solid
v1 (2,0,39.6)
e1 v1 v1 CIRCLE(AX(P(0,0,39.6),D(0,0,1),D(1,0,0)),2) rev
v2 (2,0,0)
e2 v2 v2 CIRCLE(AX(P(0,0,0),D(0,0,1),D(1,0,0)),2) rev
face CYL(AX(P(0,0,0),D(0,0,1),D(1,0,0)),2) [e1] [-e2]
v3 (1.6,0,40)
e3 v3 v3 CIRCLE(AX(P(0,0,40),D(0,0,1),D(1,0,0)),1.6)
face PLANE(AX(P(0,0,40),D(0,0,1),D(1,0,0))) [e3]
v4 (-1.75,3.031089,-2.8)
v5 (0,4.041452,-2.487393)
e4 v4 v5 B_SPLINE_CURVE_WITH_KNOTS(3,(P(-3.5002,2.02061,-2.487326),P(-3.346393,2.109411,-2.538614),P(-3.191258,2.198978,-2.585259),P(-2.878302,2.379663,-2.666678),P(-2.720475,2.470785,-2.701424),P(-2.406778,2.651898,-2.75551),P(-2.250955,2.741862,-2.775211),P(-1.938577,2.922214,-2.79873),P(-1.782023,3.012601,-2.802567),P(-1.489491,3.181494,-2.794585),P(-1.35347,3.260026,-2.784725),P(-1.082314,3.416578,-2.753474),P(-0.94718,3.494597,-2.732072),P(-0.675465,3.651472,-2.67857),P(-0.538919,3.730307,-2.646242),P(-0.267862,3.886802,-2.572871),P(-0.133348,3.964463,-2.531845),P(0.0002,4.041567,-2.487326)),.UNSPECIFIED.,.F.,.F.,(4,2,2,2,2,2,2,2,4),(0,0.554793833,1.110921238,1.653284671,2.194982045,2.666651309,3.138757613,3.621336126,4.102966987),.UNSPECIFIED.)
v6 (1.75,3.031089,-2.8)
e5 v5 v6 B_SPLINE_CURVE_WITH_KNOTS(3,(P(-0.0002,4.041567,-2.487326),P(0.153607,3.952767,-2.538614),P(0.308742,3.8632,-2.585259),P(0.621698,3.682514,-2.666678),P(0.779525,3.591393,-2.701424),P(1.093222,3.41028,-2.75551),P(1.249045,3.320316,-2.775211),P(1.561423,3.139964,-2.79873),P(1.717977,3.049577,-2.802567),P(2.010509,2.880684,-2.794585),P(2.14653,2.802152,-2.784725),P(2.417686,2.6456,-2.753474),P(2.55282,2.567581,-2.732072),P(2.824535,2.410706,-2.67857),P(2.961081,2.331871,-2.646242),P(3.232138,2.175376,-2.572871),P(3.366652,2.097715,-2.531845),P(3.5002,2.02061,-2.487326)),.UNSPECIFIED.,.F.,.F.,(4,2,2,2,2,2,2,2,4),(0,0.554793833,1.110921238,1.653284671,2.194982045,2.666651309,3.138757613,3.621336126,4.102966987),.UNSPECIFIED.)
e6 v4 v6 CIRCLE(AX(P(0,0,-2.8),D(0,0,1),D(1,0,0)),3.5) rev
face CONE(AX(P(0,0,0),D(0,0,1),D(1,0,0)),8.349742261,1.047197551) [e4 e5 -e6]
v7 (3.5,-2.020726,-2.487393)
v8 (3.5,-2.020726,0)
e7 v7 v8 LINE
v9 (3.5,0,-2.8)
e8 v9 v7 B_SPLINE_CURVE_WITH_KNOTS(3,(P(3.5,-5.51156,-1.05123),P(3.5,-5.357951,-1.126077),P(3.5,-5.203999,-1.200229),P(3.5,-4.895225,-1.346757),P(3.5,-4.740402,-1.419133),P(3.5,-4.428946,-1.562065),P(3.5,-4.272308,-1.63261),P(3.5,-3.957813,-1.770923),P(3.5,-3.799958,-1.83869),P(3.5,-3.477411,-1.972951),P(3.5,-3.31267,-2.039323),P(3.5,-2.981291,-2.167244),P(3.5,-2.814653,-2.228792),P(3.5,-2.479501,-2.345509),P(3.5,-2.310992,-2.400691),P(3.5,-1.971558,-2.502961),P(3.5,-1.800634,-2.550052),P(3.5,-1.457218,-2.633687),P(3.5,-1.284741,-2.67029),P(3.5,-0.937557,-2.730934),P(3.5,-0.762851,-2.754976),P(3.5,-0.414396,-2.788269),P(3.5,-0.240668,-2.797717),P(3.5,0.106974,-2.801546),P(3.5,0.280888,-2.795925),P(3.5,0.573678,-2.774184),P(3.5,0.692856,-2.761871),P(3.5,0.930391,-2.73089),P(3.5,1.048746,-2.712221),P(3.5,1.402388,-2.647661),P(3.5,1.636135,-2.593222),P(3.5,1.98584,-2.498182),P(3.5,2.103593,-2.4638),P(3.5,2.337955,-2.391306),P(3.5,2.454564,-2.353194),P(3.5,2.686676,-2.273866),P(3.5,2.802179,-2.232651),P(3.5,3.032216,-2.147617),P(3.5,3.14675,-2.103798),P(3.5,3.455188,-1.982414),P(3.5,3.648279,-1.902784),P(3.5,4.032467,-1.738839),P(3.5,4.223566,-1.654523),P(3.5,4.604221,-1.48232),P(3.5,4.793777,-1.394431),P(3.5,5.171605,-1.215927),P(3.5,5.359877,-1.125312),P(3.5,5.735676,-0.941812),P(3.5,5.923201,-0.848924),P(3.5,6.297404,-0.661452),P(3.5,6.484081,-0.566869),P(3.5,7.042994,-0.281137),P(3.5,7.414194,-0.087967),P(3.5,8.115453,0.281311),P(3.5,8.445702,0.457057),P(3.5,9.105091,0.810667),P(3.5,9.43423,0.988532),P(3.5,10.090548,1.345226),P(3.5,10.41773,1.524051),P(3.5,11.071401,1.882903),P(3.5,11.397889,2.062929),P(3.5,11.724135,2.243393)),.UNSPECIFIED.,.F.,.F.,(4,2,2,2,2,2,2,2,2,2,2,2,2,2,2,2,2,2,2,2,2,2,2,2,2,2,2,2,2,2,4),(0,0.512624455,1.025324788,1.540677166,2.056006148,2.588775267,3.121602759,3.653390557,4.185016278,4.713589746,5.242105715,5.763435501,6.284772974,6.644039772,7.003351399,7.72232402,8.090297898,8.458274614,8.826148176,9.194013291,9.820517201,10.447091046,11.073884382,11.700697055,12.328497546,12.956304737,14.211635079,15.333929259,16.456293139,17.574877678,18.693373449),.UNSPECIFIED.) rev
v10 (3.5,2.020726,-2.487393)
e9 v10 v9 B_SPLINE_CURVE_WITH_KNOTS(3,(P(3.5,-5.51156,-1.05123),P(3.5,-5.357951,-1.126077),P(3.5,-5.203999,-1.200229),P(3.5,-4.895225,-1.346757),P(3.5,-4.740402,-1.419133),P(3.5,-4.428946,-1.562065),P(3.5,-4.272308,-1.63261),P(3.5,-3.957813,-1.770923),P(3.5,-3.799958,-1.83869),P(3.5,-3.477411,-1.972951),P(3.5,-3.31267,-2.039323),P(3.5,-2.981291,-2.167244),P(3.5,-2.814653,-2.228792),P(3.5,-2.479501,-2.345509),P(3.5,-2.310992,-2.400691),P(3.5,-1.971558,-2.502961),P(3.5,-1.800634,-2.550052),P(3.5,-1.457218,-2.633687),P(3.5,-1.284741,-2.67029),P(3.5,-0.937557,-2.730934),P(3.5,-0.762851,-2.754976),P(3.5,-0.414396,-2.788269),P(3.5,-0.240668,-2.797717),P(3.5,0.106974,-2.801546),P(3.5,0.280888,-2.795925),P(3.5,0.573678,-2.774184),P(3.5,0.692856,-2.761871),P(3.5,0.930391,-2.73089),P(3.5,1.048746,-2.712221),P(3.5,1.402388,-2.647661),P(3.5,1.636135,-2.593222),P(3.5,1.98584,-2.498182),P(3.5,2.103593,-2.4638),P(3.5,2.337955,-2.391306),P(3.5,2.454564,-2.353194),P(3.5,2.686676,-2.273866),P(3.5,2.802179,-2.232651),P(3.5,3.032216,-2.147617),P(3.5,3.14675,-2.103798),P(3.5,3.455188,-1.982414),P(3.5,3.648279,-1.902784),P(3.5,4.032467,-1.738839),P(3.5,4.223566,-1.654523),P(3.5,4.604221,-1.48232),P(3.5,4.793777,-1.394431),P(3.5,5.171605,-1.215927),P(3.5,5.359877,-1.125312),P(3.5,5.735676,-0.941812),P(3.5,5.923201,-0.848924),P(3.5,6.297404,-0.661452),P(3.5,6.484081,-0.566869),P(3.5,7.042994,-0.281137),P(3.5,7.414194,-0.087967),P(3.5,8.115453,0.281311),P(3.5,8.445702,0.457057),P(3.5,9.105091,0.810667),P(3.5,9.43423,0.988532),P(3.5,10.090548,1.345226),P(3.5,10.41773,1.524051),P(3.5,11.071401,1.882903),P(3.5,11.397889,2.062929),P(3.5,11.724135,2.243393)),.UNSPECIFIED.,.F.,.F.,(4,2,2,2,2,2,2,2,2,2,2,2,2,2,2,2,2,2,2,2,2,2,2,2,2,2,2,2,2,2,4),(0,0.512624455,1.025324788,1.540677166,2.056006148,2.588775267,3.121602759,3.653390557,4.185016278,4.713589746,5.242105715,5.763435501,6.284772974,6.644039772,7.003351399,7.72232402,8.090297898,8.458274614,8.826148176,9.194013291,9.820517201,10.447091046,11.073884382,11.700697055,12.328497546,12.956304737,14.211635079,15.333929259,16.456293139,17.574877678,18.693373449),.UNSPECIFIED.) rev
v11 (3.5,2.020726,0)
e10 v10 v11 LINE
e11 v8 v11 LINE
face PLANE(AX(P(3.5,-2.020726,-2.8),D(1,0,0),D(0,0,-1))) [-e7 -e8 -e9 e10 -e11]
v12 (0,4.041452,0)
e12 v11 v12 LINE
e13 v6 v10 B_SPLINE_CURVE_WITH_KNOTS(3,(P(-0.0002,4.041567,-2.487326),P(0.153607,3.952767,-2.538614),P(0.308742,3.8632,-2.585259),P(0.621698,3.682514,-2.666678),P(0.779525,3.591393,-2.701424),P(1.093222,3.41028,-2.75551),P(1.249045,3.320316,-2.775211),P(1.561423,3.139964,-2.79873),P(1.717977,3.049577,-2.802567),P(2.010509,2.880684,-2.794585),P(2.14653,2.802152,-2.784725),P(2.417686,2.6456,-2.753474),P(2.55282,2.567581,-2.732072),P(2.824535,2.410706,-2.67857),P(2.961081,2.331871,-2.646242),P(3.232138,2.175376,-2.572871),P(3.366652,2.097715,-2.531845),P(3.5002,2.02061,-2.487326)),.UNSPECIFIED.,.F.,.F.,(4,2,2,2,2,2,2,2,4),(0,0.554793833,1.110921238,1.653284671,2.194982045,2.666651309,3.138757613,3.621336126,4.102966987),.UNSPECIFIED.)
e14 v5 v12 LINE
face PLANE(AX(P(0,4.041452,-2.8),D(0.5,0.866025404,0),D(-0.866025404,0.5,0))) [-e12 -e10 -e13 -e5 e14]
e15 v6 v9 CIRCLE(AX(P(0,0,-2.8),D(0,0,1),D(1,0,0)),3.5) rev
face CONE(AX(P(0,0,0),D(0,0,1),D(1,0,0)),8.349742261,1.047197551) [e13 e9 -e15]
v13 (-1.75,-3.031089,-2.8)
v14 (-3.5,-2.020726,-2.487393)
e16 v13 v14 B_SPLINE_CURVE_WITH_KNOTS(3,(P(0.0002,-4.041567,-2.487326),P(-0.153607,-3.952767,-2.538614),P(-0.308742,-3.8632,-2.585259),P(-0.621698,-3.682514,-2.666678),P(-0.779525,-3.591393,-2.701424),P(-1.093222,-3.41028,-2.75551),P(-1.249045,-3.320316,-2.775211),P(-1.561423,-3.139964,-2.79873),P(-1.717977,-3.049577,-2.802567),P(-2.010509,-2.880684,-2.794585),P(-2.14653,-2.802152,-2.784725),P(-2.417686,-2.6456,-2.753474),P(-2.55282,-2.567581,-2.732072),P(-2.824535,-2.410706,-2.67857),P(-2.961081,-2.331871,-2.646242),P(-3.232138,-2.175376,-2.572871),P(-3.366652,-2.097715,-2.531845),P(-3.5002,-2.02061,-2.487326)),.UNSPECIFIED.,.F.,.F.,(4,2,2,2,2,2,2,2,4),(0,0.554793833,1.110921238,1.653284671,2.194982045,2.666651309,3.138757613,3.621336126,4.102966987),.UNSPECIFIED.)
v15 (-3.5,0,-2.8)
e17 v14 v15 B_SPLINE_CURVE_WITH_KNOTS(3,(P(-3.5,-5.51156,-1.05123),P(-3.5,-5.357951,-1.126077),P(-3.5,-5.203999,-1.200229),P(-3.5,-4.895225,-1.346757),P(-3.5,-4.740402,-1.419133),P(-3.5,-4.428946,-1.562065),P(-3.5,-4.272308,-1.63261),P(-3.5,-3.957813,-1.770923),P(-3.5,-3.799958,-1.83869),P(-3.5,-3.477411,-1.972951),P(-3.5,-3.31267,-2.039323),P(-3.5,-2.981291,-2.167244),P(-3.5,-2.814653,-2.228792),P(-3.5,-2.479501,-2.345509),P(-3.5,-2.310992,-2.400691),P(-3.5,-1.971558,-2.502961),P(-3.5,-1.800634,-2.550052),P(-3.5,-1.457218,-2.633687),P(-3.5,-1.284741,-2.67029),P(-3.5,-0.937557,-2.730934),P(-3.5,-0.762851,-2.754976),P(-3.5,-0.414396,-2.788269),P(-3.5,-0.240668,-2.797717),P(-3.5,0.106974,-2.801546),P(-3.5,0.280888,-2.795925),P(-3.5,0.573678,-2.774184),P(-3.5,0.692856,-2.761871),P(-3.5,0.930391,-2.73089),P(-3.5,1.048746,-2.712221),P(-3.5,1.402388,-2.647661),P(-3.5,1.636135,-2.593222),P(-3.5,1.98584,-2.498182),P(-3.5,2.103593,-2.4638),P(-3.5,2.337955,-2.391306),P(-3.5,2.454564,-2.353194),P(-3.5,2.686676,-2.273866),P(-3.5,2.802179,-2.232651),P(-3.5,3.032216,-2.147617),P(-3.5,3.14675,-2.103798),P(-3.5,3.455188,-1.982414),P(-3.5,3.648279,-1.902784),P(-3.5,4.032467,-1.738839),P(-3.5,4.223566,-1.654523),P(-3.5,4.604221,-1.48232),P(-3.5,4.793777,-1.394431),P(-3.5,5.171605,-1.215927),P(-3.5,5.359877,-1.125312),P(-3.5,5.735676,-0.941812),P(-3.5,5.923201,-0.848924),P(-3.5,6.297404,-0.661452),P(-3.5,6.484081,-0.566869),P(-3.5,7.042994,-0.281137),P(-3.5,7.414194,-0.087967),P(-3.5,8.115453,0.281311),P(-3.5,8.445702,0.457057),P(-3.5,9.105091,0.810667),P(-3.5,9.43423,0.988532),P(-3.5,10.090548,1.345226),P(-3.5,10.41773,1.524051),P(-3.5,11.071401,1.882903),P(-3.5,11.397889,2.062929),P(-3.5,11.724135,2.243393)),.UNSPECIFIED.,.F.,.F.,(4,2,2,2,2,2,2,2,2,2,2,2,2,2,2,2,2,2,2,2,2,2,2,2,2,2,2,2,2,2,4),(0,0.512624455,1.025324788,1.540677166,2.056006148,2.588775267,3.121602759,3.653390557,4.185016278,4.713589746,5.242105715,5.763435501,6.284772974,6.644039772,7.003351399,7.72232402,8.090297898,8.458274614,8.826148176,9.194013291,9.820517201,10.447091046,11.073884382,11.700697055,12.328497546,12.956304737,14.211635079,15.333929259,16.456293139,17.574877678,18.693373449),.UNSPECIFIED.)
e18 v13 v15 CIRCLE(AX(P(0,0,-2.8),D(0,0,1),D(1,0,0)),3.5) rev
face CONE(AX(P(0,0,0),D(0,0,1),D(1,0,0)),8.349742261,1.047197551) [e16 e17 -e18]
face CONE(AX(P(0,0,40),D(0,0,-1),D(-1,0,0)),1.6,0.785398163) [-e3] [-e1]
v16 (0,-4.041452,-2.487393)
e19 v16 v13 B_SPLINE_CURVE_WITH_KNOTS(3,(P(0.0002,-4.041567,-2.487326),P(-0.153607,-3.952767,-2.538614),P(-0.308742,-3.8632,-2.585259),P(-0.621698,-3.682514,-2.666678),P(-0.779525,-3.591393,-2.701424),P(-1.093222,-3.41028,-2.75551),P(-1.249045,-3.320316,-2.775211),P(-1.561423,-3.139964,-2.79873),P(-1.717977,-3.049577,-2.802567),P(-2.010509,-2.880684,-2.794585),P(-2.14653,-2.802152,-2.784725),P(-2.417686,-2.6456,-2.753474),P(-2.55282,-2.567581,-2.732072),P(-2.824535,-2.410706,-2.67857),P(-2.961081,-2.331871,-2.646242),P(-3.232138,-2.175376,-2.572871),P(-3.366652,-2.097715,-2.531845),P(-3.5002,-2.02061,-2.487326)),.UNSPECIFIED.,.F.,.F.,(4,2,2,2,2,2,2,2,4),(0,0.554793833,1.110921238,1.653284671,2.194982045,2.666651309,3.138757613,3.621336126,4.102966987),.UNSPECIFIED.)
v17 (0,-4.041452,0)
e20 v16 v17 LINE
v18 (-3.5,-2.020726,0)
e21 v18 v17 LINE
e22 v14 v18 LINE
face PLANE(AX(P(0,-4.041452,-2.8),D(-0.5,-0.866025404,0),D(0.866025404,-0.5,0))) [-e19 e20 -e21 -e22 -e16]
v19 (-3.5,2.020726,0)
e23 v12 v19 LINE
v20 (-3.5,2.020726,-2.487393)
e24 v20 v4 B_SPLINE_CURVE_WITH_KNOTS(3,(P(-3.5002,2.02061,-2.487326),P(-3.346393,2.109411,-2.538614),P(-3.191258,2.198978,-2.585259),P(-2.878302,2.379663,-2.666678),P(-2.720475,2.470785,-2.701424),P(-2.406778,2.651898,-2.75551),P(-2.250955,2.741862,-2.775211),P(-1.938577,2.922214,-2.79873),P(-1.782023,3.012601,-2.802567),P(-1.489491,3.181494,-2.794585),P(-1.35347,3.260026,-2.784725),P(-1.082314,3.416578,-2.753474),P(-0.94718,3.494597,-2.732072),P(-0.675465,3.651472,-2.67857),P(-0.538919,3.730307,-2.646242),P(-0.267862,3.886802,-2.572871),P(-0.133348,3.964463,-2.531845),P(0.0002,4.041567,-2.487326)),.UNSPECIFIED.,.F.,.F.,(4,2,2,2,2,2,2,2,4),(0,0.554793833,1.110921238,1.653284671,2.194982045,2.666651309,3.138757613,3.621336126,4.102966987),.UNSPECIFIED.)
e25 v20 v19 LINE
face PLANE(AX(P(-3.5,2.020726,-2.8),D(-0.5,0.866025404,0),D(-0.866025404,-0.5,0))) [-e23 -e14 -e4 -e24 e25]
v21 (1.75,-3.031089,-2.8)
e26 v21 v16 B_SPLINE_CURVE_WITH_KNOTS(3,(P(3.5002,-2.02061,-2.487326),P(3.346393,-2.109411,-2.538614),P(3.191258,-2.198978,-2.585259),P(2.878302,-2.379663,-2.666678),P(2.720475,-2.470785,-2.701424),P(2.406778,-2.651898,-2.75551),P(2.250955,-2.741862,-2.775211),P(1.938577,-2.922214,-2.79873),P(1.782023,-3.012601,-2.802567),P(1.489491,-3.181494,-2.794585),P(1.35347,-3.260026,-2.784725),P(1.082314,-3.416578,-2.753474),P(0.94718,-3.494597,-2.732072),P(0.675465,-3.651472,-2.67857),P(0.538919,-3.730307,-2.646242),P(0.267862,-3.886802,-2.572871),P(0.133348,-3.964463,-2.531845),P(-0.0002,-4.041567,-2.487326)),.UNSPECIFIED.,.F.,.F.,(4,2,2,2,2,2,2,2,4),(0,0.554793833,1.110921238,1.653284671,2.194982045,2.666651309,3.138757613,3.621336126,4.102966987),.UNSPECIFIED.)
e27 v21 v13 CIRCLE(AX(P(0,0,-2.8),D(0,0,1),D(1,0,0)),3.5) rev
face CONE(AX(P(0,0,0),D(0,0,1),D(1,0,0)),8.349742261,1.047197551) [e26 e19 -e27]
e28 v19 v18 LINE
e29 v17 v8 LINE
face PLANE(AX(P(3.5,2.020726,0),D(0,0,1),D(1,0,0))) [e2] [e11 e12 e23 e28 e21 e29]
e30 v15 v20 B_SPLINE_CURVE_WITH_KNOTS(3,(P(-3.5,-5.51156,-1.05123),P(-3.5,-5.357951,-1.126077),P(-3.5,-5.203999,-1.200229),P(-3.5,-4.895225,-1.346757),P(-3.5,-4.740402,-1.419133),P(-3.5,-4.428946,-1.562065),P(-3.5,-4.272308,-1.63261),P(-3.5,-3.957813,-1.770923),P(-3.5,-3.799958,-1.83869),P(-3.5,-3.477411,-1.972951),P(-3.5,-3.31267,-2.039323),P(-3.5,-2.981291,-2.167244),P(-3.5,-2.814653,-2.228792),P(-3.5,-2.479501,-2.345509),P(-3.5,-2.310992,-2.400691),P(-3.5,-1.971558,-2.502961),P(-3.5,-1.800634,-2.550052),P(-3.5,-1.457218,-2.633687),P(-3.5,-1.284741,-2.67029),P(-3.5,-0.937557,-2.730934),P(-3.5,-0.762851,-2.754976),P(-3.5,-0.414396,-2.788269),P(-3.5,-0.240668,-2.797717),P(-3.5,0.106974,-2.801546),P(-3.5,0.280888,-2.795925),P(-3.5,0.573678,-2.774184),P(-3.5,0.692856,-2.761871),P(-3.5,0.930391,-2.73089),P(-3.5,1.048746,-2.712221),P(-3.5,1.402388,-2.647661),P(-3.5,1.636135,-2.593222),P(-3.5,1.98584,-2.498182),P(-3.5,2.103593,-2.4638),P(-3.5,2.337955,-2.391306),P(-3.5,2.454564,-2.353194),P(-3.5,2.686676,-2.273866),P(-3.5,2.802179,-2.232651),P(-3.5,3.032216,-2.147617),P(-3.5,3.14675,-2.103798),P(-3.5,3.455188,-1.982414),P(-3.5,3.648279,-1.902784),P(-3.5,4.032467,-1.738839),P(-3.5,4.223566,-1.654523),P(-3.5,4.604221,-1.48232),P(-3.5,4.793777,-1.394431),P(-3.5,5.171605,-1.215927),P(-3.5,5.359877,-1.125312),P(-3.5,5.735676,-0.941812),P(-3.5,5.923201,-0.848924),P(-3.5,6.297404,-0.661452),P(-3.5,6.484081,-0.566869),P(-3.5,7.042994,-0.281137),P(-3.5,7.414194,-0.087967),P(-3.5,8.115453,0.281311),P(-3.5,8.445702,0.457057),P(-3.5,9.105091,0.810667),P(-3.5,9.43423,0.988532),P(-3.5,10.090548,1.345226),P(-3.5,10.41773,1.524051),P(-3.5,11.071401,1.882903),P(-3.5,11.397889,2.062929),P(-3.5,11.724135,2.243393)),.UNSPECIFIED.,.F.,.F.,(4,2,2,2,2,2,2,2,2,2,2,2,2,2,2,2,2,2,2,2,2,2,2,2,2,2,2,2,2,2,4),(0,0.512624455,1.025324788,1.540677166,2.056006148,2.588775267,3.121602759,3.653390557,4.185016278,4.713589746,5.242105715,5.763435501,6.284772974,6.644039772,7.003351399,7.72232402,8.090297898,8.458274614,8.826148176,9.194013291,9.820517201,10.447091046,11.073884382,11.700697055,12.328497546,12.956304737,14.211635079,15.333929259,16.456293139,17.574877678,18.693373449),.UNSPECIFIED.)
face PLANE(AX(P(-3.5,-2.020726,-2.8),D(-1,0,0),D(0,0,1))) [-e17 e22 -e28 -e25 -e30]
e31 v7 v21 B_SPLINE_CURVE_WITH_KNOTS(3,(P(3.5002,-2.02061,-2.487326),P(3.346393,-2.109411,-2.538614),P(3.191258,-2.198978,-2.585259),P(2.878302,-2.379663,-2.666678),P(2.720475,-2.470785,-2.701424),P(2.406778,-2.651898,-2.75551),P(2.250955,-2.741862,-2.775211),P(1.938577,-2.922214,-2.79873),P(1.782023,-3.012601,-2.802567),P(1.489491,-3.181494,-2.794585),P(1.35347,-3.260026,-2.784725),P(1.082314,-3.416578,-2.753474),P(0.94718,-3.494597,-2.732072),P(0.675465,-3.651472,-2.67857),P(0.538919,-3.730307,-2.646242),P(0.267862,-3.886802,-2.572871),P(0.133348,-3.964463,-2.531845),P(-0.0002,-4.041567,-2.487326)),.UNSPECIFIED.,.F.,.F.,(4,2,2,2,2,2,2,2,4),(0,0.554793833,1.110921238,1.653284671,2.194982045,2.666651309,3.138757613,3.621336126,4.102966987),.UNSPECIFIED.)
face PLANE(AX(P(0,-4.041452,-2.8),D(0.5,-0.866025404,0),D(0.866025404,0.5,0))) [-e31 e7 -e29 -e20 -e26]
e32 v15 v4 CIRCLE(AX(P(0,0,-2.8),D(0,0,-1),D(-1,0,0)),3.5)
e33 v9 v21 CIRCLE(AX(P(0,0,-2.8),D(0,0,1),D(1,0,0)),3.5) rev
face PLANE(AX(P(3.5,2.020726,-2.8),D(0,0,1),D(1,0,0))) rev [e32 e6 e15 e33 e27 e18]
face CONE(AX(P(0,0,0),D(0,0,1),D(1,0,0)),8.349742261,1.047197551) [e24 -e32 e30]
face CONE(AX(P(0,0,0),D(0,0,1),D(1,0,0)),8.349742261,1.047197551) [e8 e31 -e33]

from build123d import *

# Parameters (mm, degrees)
ESQUISSE1_W        = 2
ESQUISSE1_H        = 40
BOSS_EXTRU_1_DEPTH = 2.8


with BuildPart() as part:
    # Esquisse1 → Base-Révolution (revolve)
    with BuildSketch(Plane(origin=(0, 0, 0), x_dir=(1, 0, 0), z_dir=(0, 1, 0))):
        with Locations((1, -20)):
            Rectangle(ESQUISSE1_W, ESQUISSE1_H)
    revolve(axis=Axis((0, 0, 0), (0, 0, 1)))

    # Chanfrein1: read off the stored shape, not the designer's step
    # Chanfrein1 outline → Chanfrein1 (revolve, cut)
    with BuildSketch(Plane.XZ):
        Polygon((2, 40), (1.6, 40), (2, 39.6), align=None)
    revolve(axis=Axis((0, 0, 0), (0, 0, 1)), mode=Mode.SUBTRACT)

    # Esquisse6 → Boss.-Extru.1 (add)
    with BuildSketch(Plane.XY):
        Polygon((3.5, -2.020725942), (3.5, 2.020725942), (0, 4.041451884), (-3.5, 2.020725942), (-3.5, -2.020725942), (0, -4.041451884), align=None)
    extrude(amount=-BOSS_EXTRU_1_DEPTH)

    # Esquisse7 → Enlèvement de matière-Révolution1 (revolve, cut)
    with BuildSketch(Plane(origin=(0, 0, 0), x_dir=(1, 0, 0), z_dir=(0, 1, 0))):
        Polygon((-3.5, 2.8), (-8.349742261, 2.8), (-8.349742261, 0), align=None)
    revolve(axis=Axis((0, 0, -6.239446496), (0, 0, 1)), mode=Mode.SUBTRACT)


solid = part.part
